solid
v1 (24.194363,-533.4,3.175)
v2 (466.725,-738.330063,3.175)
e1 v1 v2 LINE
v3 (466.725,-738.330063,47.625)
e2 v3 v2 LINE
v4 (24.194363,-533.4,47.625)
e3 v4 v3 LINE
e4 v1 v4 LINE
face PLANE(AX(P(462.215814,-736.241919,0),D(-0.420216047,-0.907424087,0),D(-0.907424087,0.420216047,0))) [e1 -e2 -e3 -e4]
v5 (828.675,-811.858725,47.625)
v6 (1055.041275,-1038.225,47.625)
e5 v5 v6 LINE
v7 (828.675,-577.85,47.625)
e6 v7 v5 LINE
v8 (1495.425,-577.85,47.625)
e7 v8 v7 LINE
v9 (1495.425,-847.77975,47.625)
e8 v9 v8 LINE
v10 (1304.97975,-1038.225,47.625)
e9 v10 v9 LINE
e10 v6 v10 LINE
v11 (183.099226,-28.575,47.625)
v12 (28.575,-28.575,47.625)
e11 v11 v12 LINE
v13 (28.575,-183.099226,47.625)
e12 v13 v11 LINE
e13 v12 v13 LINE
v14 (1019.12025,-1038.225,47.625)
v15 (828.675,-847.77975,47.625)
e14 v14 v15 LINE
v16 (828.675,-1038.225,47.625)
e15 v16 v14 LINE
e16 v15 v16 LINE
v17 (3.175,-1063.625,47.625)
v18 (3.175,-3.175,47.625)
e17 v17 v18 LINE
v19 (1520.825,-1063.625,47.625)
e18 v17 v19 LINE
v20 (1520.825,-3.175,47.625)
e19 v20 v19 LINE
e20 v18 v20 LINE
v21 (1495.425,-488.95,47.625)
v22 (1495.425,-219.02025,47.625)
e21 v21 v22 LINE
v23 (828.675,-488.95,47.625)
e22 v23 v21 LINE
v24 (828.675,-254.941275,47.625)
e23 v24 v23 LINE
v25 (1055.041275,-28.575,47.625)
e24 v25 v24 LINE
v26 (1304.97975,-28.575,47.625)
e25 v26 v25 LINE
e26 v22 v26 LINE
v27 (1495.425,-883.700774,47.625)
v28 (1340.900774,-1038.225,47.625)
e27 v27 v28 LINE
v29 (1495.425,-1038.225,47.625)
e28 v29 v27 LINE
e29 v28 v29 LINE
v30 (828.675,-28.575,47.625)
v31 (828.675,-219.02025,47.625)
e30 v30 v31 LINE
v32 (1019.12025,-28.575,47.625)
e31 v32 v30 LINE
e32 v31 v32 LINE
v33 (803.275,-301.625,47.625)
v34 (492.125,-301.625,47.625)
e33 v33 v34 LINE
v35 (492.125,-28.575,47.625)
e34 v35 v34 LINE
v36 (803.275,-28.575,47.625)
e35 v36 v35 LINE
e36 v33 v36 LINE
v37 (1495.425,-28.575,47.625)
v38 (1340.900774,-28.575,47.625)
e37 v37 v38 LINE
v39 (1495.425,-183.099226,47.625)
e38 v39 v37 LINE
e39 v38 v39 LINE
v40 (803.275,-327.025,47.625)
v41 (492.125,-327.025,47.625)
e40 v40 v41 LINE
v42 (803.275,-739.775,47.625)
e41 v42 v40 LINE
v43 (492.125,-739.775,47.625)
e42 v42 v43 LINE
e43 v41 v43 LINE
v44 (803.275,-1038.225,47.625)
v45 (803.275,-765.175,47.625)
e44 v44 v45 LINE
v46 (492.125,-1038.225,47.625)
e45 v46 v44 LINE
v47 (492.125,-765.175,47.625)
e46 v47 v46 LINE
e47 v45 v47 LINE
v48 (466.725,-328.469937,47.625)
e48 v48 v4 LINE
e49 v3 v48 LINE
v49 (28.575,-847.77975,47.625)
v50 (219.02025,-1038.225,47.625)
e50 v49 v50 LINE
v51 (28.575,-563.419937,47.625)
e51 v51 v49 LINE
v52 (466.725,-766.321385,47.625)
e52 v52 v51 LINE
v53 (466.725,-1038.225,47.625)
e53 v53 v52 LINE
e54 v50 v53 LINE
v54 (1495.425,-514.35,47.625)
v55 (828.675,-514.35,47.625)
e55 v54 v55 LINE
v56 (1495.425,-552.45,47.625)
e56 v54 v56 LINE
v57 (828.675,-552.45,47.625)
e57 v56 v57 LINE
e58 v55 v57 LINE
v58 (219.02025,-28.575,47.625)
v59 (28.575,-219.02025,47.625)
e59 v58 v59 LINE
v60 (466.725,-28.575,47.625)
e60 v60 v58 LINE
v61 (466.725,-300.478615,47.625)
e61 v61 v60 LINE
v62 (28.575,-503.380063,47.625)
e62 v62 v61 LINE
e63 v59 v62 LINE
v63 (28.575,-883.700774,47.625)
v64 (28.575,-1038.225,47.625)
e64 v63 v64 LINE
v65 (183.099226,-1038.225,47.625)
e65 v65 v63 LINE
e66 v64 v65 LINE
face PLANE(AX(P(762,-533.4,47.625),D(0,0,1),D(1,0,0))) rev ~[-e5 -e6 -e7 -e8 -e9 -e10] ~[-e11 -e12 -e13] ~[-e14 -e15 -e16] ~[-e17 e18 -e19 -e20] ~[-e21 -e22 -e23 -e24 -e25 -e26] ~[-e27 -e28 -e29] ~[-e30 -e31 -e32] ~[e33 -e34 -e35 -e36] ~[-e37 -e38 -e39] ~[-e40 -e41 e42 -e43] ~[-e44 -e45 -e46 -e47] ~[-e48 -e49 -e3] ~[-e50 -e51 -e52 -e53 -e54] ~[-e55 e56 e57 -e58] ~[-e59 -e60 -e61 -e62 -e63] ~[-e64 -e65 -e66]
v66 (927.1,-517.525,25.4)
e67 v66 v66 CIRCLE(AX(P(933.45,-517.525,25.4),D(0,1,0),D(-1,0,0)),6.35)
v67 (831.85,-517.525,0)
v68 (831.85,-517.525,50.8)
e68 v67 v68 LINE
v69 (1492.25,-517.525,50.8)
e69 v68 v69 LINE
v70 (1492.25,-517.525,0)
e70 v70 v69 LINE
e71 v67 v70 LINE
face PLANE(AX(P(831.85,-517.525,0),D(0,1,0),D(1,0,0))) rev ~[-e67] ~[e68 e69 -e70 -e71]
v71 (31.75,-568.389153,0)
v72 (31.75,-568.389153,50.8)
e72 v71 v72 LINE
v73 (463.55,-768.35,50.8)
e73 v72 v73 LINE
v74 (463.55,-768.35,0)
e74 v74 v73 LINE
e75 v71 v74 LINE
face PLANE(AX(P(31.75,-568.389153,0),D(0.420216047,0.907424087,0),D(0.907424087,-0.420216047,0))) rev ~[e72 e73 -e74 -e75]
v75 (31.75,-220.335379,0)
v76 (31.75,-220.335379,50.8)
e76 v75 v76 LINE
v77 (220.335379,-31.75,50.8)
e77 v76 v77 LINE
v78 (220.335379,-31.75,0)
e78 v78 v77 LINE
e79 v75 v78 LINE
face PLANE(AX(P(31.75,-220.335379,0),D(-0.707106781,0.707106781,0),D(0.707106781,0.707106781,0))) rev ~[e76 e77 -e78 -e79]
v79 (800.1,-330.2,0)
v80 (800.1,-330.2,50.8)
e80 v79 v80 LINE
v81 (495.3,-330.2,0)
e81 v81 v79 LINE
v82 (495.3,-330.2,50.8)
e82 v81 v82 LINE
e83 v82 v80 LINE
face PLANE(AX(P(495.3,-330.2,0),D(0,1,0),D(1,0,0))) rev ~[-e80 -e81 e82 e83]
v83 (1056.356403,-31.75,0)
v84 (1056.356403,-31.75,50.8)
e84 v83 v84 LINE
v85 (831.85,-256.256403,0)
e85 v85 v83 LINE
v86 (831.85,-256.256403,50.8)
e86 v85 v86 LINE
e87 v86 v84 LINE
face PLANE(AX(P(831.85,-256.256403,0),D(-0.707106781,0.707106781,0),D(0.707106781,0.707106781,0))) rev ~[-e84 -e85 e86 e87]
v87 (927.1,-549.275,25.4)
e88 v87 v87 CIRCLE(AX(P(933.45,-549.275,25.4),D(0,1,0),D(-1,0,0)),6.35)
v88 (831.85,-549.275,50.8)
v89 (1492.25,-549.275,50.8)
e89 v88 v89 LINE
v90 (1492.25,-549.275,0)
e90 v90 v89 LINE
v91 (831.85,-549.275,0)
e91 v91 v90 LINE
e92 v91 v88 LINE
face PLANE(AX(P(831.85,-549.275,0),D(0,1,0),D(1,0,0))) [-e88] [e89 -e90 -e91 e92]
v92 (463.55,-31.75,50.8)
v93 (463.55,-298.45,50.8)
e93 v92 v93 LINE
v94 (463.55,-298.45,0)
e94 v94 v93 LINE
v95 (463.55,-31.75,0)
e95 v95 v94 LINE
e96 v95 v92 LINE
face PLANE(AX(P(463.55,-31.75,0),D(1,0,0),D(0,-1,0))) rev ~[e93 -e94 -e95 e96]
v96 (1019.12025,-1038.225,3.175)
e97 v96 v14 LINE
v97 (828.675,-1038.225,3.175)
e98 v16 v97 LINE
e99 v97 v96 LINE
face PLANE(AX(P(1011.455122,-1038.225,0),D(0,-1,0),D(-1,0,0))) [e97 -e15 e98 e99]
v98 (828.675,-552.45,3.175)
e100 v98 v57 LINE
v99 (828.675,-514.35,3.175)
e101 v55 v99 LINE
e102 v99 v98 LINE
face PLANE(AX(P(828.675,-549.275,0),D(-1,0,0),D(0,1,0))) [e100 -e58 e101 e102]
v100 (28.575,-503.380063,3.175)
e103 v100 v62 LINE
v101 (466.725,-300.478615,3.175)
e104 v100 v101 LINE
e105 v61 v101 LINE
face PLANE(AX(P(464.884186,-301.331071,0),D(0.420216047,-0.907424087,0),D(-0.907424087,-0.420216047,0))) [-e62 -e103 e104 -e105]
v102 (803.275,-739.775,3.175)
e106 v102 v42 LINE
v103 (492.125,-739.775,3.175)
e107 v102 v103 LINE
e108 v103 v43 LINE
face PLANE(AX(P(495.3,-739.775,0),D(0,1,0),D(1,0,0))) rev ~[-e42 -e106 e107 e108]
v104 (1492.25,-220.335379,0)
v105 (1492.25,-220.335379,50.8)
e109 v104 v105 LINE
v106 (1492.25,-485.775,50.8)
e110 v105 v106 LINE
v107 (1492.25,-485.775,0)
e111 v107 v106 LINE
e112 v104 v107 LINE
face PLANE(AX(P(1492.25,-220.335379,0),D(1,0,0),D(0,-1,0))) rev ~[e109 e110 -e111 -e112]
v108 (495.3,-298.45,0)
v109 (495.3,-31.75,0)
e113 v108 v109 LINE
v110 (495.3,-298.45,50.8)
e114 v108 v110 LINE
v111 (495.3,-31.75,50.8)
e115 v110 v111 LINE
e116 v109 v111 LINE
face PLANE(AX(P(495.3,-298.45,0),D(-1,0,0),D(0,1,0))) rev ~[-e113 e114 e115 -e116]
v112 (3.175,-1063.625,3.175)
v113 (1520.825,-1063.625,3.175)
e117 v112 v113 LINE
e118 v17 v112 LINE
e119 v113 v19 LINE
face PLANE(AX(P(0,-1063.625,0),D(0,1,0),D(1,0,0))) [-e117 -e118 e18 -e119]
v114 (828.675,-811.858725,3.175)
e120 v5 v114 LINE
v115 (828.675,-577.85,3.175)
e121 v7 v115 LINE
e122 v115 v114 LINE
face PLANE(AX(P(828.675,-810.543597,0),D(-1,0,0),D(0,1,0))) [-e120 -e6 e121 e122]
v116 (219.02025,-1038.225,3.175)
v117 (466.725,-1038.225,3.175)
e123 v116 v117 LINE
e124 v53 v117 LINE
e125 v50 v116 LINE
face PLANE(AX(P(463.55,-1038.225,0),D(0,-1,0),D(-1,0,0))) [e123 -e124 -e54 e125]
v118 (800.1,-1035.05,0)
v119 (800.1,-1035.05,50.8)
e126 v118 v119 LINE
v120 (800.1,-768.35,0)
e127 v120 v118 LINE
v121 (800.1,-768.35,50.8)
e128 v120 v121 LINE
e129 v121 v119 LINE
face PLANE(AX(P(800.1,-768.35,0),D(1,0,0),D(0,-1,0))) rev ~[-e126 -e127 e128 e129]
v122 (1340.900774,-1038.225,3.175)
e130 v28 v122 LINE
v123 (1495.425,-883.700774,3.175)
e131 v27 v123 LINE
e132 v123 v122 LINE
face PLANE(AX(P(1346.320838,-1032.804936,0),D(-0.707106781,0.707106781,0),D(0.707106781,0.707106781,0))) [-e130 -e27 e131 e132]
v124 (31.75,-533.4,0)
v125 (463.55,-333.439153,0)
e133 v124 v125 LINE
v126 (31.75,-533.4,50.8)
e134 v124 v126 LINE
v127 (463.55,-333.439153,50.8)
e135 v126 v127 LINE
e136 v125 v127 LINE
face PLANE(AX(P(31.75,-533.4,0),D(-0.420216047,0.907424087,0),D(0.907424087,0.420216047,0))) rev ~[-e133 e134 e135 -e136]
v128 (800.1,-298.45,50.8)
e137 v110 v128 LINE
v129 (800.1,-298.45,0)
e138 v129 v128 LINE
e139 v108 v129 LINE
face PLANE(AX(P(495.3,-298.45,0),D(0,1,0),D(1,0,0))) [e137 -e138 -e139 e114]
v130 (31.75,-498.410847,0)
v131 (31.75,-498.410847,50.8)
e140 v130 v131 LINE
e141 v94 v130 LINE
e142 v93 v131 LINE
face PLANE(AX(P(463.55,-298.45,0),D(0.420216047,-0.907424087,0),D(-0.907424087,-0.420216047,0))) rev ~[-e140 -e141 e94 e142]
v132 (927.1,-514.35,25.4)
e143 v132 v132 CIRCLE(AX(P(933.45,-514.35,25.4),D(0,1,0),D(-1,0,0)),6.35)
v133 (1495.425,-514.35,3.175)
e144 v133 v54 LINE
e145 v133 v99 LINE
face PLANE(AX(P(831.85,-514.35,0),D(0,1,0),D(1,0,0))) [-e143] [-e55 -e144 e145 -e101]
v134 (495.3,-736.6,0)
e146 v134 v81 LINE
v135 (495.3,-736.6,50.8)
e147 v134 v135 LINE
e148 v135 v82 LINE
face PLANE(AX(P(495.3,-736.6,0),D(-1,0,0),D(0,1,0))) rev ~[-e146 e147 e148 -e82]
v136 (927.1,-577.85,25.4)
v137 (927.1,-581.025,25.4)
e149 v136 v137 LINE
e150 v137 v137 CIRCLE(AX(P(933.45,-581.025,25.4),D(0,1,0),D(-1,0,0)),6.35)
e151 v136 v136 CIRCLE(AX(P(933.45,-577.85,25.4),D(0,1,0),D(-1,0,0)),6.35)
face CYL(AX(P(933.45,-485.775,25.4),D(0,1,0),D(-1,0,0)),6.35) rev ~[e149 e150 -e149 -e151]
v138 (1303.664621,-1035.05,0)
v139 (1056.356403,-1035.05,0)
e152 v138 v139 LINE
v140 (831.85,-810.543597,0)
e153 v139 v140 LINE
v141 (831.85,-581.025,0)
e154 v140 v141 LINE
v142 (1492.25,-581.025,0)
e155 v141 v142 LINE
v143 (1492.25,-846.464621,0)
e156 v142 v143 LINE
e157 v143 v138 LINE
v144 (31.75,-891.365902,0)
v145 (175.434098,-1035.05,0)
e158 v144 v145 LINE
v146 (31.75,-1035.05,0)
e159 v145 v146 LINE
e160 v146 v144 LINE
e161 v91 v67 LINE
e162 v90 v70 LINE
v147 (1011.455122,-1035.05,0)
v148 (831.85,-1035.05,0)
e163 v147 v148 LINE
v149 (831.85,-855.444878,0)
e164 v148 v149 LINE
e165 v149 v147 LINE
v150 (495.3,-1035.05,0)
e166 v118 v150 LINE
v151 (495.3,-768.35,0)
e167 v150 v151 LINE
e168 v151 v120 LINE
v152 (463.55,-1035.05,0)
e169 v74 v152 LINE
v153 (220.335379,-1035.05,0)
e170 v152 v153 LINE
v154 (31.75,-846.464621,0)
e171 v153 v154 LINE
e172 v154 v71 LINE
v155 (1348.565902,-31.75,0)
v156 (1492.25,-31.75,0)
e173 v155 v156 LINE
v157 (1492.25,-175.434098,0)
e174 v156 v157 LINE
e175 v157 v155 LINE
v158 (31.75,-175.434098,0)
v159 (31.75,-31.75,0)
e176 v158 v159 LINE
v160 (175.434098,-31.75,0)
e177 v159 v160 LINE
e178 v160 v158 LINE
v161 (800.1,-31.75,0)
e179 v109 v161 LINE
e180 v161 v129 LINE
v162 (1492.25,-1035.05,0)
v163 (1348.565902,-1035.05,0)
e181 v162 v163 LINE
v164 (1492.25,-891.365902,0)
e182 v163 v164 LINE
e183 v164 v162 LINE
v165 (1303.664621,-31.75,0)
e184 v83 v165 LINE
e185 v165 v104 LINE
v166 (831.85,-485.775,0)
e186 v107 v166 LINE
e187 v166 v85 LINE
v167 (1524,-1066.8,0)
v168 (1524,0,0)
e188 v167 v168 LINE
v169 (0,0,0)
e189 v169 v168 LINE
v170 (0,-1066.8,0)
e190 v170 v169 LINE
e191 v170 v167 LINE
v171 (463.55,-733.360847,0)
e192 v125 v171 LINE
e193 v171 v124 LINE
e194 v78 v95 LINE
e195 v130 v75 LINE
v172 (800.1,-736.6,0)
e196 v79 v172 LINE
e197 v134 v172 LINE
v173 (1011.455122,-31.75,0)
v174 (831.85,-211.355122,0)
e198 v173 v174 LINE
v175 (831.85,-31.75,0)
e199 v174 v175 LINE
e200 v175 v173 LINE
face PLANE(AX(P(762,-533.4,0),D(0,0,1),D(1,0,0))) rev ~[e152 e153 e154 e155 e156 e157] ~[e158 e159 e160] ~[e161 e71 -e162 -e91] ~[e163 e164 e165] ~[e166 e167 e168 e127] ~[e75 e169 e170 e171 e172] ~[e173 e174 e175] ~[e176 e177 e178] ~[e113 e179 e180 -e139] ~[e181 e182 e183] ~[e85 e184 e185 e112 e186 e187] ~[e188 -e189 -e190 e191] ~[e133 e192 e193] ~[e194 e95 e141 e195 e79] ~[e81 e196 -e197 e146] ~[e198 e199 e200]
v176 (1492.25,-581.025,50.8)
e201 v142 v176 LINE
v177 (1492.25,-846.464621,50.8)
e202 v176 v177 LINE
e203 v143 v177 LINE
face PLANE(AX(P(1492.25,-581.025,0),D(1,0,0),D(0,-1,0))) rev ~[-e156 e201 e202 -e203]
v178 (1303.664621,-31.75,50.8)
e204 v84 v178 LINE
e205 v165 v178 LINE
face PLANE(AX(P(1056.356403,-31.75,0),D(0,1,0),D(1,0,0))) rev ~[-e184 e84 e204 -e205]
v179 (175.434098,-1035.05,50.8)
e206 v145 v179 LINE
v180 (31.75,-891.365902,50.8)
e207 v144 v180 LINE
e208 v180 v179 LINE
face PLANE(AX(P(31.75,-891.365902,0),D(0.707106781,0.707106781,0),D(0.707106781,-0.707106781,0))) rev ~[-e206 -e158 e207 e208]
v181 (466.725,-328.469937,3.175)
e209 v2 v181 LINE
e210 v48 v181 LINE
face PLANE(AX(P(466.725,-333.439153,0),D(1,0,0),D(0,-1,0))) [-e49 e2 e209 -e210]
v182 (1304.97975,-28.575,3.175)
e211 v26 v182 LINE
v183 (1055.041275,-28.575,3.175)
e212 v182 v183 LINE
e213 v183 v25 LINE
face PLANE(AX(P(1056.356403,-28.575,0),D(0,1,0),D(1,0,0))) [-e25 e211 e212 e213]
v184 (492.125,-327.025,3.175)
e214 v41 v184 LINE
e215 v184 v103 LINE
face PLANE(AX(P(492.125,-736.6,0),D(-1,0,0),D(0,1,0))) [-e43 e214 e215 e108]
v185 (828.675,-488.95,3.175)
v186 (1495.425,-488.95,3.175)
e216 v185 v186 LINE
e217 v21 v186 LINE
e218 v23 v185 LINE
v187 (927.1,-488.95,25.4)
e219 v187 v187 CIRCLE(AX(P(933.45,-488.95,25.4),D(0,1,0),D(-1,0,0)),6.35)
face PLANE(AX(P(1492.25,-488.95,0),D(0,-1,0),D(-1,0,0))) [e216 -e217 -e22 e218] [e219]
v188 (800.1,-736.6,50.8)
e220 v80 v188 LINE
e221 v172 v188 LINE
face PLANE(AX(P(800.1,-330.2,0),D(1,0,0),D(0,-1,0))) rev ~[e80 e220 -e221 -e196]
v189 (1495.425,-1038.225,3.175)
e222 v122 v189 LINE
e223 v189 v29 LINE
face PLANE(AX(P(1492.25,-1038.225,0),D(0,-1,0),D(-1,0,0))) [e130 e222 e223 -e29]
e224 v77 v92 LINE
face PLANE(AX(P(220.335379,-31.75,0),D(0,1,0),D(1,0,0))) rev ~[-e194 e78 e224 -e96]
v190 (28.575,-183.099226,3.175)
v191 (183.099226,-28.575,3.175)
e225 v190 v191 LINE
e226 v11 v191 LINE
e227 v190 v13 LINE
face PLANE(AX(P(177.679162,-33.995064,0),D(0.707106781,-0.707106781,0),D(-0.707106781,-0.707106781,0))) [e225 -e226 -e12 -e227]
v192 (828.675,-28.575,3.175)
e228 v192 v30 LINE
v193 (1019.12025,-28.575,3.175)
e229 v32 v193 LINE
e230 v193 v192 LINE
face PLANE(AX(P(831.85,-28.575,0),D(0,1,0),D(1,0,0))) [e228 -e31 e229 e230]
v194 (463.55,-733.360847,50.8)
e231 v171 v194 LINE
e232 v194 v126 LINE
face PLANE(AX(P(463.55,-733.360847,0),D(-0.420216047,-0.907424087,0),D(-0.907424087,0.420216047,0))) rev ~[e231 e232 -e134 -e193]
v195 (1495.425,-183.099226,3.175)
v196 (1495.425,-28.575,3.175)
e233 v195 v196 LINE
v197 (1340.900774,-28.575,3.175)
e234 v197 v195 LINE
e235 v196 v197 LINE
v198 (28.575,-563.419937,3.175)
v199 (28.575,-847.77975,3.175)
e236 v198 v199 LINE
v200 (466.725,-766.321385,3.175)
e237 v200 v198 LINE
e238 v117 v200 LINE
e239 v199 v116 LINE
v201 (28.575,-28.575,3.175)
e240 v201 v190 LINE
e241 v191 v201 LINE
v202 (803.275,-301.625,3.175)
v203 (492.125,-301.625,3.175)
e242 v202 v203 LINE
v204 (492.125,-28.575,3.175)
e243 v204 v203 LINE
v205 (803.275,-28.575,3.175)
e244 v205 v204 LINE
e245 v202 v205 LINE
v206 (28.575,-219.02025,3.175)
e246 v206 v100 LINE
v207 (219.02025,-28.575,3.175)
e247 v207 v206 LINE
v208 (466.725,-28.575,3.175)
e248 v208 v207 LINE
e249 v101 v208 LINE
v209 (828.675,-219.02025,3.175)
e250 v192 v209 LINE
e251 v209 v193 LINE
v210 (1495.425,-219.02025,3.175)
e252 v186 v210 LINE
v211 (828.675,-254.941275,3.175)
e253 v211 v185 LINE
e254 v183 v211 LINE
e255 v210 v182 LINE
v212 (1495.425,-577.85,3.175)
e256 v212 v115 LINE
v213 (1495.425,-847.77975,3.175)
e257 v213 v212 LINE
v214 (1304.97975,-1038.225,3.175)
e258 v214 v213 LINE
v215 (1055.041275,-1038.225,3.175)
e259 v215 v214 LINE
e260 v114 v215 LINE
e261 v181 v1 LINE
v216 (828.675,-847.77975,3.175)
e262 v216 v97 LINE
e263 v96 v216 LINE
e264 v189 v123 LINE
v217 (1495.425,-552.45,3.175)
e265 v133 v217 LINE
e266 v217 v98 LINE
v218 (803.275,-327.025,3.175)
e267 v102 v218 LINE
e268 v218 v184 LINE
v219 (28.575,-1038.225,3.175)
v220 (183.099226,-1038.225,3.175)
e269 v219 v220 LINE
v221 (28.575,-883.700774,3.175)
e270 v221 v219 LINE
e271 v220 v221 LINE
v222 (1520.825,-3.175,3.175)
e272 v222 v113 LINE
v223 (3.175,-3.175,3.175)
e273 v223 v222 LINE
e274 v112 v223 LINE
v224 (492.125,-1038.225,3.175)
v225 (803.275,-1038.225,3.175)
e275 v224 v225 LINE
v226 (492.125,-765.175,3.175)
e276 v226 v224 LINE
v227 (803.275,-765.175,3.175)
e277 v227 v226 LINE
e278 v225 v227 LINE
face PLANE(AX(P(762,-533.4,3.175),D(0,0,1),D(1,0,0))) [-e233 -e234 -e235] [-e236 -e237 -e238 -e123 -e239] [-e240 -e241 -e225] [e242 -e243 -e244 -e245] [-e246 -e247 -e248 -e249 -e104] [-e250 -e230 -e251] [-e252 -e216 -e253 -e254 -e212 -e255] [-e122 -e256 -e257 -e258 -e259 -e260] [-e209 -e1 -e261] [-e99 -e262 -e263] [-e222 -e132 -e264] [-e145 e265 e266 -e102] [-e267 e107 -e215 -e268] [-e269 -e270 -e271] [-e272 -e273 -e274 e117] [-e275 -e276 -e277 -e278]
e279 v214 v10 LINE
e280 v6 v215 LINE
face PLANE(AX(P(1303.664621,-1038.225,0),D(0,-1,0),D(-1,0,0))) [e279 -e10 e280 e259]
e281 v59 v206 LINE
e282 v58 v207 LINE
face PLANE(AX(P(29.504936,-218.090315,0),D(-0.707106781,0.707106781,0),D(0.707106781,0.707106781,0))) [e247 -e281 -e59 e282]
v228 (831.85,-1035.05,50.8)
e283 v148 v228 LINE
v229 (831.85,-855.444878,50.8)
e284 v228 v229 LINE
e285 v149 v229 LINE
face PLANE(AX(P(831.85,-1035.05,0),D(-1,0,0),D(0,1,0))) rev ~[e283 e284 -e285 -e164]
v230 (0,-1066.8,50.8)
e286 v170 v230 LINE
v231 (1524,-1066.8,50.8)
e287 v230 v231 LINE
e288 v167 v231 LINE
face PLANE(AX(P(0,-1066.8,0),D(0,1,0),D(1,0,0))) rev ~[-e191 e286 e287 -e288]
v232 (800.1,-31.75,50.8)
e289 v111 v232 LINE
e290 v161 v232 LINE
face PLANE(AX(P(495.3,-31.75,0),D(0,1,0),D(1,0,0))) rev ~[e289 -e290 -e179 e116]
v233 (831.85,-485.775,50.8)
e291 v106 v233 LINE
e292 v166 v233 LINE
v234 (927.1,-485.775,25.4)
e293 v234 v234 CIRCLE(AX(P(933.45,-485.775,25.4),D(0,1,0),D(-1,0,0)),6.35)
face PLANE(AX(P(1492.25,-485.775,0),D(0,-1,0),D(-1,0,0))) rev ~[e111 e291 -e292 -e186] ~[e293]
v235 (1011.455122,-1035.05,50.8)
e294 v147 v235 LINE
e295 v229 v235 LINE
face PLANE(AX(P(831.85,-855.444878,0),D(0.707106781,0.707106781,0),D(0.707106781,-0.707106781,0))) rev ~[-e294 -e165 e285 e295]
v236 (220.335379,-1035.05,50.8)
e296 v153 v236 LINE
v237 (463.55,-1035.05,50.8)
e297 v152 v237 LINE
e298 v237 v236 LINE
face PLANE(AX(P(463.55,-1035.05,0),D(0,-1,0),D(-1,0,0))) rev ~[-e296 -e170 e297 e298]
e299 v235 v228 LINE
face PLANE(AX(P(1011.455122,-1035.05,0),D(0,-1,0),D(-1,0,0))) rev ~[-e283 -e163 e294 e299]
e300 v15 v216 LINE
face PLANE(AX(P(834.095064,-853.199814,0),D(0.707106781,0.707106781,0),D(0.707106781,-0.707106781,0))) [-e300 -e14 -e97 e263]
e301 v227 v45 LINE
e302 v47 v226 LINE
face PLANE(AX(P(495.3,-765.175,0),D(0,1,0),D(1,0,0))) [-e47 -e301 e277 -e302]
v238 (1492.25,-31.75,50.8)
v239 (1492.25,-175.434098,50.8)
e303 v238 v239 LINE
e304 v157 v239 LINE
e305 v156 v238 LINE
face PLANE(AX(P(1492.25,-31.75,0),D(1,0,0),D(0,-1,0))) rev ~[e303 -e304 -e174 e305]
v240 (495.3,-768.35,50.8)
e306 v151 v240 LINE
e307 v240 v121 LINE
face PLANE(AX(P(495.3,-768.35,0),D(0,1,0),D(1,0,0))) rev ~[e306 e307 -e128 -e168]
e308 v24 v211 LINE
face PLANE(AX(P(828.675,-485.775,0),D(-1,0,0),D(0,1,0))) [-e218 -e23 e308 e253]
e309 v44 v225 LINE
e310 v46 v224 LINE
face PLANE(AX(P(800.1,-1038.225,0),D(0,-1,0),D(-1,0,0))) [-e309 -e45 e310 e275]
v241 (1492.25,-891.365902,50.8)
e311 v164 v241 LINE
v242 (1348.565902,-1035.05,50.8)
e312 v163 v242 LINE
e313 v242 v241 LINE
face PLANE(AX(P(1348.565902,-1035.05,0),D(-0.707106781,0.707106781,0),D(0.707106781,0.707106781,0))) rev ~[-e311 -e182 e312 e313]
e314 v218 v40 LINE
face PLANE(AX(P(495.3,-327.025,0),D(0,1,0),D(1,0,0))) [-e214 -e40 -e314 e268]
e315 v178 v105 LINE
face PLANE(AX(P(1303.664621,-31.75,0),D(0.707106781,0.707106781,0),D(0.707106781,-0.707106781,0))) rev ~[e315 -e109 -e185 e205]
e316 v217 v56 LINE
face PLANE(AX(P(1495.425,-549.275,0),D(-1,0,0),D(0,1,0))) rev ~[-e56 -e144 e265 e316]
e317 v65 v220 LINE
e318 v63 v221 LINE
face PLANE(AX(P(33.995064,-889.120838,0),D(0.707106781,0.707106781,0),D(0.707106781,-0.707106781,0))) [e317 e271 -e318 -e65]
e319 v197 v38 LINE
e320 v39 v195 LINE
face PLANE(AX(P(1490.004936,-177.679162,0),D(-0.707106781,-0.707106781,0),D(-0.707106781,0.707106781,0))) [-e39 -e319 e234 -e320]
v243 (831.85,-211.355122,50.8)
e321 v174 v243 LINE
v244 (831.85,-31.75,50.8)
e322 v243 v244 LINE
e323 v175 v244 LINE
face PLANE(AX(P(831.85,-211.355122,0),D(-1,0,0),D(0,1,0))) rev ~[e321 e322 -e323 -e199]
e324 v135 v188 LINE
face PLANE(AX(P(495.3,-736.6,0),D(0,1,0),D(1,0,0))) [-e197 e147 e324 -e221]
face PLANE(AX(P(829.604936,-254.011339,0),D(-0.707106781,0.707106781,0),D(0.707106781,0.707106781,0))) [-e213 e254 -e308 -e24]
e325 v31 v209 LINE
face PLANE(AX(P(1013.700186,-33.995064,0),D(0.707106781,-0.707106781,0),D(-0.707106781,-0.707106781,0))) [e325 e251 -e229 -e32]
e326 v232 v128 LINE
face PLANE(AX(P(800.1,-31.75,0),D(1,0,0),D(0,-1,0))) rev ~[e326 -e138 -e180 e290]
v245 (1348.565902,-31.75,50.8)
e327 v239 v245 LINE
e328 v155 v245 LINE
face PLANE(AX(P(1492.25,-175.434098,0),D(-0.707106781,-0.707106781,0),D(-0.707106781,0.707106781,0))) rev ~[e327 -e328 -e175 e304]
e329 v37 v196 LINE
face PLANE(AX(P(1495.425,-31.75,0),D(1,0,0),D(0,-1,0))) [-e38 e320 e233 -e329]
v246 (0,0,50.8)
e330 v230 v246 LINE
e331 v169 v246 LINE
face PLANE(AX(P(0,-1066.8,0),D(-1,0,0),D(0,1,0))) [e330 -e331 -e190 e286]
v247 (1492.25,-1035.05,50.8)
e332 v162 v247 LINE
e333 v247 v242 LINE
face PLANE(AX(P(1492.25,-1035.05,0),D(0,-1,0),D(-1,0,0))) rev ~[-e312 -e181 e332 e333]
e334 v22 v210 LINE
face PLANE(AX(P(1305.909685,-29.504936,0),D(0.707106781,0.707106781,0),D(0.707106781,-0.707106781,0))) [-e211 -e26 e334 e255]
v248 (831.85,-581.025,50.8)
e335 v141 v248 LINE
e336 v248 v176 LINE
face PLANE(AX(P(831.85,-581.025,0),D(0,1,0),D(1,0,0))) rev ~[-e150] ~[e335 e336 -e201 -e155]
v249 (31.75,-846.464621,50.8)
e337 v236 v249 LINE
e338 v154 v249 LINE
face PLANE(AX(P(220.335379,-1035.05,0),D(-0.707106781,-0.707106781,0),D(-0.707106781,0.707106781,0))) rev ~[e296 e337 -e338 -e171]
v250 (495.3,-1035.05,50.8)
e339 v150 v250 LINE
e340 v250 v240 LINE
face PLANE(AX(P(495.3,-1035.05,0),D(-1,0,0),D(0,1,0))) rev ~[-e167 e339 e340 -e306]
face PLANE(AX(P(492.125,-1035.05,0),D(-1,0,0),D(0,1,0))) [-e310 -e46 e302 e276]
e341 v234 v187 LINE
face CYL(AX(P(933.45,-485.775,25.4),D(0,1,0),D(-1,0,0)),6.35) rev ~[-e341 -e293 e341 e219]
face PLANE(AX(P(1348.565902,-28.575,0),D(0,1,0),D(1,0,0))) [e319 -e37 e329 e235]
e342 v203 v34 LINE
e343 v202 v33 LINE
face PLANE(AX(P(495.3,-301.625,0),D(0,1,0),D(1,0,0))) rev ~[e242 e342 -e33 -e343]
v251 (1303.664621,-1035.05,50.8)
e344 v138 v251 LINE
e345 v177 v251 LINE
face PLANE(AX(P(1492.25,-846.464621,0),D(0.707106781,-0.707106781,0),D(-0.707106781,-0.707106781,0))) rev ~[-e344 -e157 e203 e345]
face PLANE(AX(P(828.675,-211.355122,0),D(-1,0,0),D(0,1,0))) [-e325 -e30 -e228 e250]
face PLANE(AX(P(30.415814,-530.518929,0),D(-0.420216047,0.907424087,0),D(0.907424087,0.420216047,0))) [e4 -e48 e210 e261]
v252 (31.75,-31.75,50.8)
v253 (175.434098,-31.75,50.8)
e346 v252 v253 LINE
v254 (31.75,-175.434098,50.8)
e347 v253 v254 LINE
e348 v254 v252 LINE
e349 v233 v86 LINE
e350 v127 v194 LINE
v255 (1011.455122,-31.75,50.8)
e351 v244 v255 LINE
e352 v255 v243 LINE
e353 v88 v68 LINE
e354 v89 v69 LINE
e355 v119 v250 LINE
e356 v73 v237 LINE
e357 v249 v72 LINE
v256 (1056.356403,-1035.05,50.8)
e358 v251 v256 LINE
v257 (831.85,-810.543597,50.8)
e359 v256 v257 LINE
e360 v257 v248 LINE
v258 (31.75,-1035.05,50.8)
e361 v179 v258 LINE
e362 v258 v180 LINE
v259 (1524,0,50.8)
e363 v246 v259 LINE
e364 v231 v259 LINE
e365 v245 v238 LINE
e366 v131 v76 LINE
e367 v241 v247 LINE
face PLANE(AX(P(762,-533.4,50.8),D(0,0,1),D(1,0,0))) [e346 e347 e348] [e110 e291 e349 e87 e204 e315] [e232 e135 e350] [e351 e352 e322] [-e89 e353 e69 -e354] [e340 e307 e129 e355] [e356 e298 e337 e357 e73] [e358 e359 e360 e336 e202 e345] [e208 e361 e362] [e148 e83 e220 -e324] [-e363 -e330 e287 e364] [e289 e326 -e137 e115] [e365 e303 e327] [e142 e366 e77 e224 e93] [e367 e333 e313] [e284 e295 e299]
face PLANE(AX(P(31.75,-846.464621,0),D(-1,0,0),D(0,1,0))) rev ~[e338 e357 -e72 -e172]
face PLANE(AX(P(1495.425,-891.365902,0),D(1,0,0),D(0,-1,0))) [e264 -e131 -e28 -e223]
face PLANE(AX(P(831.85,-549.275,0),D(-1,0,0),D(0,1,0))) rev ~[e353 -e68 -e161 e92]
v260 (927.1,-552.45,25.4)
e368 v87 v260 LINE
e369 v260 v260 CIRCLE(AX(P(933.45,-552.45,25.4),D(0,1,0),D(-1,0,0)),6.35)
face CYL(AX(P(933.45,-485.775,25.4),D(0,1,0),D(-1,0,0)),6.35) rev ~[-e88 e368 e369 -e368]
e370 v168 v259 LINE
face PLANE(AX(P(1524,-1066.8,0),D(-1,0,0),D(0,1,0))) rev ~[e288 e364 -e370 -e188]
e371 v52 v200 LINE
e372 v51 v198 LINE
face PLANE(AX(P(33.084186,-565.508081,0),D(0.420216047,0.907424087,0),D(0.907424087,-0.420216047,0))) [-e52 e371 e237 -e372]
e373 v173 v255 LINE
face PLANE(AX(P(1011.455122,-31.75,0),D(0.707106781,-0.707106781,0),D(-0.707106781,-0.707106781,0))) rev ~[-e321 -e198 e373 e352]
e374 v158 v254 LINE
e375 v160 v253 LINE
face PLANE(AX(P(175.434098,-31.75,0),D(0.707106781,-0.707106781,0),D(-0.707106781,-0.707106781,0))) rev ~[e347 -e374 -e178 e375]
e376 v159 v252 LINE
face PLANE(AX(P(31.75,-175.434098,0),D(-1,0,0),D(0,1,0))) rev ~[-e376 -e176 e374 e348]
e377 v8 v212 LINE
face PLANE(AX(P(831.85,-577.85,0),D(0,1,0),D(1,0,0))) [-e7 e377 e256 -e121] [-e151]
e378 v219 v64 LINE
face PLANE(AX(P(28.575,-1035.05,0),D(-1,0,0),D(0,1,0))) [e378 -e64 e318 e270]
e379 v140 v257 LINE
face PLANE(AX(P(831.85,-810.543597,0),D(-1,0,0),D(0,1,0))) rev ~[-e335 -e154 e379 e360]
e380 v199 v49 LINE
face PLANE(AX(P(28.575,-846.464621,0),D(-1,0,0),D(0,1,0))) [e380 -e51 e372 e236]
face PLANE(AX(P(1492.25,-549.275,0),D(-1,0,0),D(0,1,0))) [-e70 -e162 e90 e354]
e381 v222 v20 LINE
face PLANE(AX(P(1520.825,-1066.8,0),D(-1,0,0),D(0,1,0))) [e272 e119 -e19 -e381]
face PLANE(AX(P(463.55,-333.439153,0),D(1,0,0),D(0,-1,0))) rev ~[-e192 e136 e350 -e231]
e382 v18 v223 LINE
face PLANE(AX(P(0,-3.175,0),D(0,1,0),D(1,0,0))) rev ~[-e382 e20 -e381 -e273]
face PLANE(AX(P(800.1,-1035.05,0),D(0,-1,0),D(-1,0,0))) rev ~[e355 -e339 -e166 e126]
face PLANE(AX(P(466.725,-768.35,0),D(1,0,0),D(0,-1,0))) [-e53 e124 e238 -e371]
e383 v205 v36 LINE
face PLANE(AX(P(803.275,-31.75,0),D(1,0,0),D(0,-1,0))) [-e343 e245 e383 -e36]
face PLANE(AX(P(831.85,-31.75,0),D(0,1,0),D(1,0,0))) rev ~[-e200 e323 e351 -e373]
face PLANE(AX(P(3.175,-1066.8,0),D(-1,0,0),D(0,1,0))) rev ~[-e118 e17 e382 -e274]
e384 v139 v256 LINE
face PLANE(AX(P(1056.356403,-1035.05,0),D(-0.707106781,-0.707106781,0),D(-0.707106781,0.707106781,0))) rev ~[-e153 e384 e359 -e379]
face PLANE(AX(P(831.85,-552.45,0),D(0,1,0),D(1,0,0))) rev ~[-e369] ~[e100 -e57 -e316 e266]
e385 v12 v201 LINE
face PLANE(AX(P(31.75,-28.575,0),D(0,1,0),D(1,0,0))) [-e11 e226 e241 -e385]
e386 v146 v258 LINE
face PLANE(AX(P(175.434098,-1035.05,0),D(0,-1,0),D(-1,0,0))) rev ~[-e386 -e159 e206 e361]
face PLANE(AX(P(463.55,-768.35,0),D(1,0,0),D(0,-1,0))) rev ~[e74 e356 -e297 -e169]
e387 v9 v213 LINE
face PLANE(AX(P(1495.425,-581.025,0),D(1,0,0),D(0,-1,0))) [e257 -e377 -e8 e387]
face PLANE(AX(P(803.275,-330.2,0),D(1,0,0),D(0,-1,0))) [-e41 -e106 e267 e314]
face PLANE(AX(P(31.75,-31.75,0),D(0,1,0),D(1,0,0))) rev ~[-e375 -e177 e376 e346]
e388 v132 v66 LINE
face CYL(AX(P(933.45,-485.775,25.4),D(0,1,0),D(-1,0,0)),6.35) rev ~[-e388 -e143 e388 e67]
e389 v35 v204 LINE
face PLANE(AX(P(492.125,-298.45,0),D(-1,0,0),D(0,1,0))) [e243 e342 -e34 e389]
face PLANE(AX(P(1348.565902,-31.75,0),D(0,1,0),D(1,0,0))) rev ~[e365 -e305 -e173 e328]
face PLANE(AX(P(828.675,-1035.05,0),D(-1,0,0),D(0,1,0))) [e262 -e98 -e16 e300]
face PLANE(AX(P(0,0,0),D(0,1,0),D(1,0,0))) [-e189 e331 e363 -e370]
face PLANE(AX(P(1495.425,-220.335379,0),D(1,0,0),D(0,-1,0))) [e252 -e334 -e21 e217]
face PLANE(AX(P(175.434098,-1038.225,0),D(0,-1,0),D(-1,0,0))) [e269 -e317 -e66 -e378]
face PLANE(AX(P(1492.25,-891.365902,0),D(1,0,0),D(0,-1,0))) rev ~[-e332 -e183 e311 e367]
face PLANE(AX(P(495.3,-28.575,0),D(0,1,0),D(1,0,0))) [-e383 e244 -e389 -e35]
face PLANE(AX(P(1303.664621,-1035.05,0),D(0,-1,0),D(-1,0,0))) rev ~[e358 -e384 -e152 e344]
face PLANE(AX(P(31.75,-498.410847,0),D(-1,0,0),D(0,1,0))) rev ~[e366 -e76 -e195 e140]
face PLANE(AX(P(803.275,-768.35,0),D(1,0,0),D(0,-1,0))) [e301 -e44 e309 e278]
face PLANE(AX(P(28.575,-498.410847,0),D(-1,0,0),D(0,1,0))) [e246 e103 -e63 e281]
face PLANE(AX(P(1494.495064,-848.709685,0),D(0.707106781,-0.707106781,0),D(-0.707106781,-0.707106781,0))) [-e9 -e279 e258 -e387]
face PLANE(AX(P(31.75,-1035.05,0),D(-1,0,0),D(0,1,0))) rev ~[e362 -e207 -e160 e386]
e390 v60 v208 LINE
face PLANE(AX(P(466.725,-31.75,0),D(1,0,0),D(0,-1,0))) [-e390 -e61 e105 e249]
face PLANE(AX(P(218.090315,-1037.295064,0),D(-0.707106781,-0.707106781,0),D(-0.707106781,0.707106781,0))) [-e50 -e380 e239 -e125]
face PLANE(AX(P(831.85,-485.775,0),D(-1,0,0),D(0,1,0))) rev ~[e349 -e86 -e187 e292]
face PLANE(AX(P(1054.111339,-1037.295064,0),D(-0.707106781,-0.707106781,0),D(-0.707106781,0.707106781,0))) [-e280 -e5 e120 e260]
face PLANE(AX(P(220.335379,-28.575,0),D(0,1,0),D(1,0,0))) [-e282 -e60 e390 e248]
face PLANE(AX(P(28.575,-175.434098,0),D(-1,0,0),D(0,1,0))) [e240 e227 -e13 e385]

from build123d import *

# Parameters (mm, degrees)
F0_W     = 1524
F0_H     = 1066.8
F0_W_2   = 660.4
F0_H_2   = 31.75
F0_W_3   = 304.8
F1_DEPTH = 50.8
F3_R     = 6.35
F4_DEPTH = 127
F5_T     = -3.175


# Not quite as in the source:
# - a feature names something its author has since deleted; it is built from what else it names


with BuildPart() as f1:
    # F0 (on Top) → F1 (new body)
    with BuildSketch(Plane.XY):
        with Locations((762, -533.4)):
            Rectangle(F0_W, F0_H)
        Polygon((1011.4551224214, -1035.05), (831.85, -1035.05), (831.85, -855.4448775786), (831.85, -810.5435969733), (831.85, -581.025), (1492.25, -581.025), (1492.25, -788.03246), (1492.25, -832.48246), (1492.25, -846.4646214575), (1492.25, -891.3659020629), (1492.25, -1035.05), (1348.5659020629, -1035.05), (1303.6646214575, -1035.05), (1056.3564030267, -1035.05), align=None, mode=Mode.SUBTRACT)
        Polygon((31.75, -175.4340979371), (31.75, -31.75), (175.4340979371, -31.75), (220.3353785425, -31.75), (463.55, -31.75), (463.55, -298.45), (463.55, -333.4391527639), (463.55, -733.3608472361), (463.55, -768.35), (463.55, -1035.05), (220.3353785425, -1035.05), (175.4340979371, -1035.05), (31.75, -1035.05), (31.75, -891.3659020629), (31.75, -846.4646214575), (31.75, -832.48246), (31.75, -788.03246), (31.75, -568.3891527639), (31.75, -533.4), (31.75, -498.4108472361), (31.75, -220.3353785425), align=None, mode=Mode.SUBTRACT)
        Polygon((800.1, -1035.05), (495.3, -1035.05), (495.3, -768.35), (495.3, -736.6), (495.3, -330.2), (495.3, -298.45), (495.3, -31.75), (800.1, -31.75), (800.1, -298.45), (800.1, -330.2), (800.1, -736.6), (800.1, -768.35), align=None, mode=Mode.SUBTRACT)
        with Locations((1162.05, -533.4)):
            Rectangle(F0_W_2, F0_H_2, mode=Mode.SUBTRACT)
        Polygon((1348.5659020629, -31.75), (1492.25, -31.75), (1492.25, -175.4340979371), (1492.25, -220.3353785425), (1492.25, -485.775), (831.85, -485.775), (831.85, -256.2564030267), (831.85, -211.3551224214), (831.85, -31.75), (1011.4551224214, -31.75), (1056.3564030267, -31.75), (1303.6646214575, -31.75), align=None, mode=Mode.SUBTRACT)
        Polygon((463.55, -298.45), (31.75, -498.4108472361), (31.75, -533.4), (463.55, -333.4391527639), align=None)
        Polygon((463.55, -733.3608472361), (31.75, -533.4), (31.75, -568.3891527639), (463.55, -768.35), align=None)
        with Locations((647.7, -752.475)):
            Rectangle(F0_W_3, F0_H_2)
        with Locations((647.7, -314.325)):
            Rectangle(F0_W_3, F0_H_2)
        Polygon((831.85, -256.2564030267), (1056.3564030267, -31.75), (1011.4551224214, -31.75), (831.85, -211.3551224214), align=None)
        Polygon((831.85, -810.5435969733), (831.85, -855.4448775786), (1011.4551224214, -1035.05), (1056.3564030267, -1035.05), align=None)
        Polygon((220.3353785425, -31.75), (175.4340979371, -31.75), (31.75, -175.4340979371), (31.75, -220.3353785425), align=None)
        Polygon((220.3353785425, -1035.05), (31.75, -846.4646214575), (31.75, -891.3659020629), (175.4340979371, -1035.05), align=None)
        Polygon((1492.25, -846.4646214575), (1303.6646214575, -1035.05), (1348.5659020629, -1035.05), (1492.25, -891.3659020629), align=None)
        Polygon((1492.25, -220.3353785425), (1492.25, -175.4340979371), (1348.5659020629, -31.75), (1303.6646214575, -31.75), align=None)
    extrude(amount=F1_DEPTH)

    # F3 (on face) → F4 (cut)
    with BuildSketch(Plane(origin=(0, -485.775, 0), x_dir=(-1, 0, 0), z_dir=(0, 1, 0))):
        with Locations((-933.45, 25.4)):
            Circle(F3_R)
    extrude(amount=-F4_DEPTH, mode=Mode.SUBTRACT)

    # F5
    f5_openings = [f1.faces().sort_by_distance(p)[0] for p in [
        (939.8, -565.15, 25.4),
        (939.8, -501.65, 25.4),
    ]]
    offset(amount=F5_T, openings=f5_openings, kind=Kind.INTERSECTION)


solid = f1.part
